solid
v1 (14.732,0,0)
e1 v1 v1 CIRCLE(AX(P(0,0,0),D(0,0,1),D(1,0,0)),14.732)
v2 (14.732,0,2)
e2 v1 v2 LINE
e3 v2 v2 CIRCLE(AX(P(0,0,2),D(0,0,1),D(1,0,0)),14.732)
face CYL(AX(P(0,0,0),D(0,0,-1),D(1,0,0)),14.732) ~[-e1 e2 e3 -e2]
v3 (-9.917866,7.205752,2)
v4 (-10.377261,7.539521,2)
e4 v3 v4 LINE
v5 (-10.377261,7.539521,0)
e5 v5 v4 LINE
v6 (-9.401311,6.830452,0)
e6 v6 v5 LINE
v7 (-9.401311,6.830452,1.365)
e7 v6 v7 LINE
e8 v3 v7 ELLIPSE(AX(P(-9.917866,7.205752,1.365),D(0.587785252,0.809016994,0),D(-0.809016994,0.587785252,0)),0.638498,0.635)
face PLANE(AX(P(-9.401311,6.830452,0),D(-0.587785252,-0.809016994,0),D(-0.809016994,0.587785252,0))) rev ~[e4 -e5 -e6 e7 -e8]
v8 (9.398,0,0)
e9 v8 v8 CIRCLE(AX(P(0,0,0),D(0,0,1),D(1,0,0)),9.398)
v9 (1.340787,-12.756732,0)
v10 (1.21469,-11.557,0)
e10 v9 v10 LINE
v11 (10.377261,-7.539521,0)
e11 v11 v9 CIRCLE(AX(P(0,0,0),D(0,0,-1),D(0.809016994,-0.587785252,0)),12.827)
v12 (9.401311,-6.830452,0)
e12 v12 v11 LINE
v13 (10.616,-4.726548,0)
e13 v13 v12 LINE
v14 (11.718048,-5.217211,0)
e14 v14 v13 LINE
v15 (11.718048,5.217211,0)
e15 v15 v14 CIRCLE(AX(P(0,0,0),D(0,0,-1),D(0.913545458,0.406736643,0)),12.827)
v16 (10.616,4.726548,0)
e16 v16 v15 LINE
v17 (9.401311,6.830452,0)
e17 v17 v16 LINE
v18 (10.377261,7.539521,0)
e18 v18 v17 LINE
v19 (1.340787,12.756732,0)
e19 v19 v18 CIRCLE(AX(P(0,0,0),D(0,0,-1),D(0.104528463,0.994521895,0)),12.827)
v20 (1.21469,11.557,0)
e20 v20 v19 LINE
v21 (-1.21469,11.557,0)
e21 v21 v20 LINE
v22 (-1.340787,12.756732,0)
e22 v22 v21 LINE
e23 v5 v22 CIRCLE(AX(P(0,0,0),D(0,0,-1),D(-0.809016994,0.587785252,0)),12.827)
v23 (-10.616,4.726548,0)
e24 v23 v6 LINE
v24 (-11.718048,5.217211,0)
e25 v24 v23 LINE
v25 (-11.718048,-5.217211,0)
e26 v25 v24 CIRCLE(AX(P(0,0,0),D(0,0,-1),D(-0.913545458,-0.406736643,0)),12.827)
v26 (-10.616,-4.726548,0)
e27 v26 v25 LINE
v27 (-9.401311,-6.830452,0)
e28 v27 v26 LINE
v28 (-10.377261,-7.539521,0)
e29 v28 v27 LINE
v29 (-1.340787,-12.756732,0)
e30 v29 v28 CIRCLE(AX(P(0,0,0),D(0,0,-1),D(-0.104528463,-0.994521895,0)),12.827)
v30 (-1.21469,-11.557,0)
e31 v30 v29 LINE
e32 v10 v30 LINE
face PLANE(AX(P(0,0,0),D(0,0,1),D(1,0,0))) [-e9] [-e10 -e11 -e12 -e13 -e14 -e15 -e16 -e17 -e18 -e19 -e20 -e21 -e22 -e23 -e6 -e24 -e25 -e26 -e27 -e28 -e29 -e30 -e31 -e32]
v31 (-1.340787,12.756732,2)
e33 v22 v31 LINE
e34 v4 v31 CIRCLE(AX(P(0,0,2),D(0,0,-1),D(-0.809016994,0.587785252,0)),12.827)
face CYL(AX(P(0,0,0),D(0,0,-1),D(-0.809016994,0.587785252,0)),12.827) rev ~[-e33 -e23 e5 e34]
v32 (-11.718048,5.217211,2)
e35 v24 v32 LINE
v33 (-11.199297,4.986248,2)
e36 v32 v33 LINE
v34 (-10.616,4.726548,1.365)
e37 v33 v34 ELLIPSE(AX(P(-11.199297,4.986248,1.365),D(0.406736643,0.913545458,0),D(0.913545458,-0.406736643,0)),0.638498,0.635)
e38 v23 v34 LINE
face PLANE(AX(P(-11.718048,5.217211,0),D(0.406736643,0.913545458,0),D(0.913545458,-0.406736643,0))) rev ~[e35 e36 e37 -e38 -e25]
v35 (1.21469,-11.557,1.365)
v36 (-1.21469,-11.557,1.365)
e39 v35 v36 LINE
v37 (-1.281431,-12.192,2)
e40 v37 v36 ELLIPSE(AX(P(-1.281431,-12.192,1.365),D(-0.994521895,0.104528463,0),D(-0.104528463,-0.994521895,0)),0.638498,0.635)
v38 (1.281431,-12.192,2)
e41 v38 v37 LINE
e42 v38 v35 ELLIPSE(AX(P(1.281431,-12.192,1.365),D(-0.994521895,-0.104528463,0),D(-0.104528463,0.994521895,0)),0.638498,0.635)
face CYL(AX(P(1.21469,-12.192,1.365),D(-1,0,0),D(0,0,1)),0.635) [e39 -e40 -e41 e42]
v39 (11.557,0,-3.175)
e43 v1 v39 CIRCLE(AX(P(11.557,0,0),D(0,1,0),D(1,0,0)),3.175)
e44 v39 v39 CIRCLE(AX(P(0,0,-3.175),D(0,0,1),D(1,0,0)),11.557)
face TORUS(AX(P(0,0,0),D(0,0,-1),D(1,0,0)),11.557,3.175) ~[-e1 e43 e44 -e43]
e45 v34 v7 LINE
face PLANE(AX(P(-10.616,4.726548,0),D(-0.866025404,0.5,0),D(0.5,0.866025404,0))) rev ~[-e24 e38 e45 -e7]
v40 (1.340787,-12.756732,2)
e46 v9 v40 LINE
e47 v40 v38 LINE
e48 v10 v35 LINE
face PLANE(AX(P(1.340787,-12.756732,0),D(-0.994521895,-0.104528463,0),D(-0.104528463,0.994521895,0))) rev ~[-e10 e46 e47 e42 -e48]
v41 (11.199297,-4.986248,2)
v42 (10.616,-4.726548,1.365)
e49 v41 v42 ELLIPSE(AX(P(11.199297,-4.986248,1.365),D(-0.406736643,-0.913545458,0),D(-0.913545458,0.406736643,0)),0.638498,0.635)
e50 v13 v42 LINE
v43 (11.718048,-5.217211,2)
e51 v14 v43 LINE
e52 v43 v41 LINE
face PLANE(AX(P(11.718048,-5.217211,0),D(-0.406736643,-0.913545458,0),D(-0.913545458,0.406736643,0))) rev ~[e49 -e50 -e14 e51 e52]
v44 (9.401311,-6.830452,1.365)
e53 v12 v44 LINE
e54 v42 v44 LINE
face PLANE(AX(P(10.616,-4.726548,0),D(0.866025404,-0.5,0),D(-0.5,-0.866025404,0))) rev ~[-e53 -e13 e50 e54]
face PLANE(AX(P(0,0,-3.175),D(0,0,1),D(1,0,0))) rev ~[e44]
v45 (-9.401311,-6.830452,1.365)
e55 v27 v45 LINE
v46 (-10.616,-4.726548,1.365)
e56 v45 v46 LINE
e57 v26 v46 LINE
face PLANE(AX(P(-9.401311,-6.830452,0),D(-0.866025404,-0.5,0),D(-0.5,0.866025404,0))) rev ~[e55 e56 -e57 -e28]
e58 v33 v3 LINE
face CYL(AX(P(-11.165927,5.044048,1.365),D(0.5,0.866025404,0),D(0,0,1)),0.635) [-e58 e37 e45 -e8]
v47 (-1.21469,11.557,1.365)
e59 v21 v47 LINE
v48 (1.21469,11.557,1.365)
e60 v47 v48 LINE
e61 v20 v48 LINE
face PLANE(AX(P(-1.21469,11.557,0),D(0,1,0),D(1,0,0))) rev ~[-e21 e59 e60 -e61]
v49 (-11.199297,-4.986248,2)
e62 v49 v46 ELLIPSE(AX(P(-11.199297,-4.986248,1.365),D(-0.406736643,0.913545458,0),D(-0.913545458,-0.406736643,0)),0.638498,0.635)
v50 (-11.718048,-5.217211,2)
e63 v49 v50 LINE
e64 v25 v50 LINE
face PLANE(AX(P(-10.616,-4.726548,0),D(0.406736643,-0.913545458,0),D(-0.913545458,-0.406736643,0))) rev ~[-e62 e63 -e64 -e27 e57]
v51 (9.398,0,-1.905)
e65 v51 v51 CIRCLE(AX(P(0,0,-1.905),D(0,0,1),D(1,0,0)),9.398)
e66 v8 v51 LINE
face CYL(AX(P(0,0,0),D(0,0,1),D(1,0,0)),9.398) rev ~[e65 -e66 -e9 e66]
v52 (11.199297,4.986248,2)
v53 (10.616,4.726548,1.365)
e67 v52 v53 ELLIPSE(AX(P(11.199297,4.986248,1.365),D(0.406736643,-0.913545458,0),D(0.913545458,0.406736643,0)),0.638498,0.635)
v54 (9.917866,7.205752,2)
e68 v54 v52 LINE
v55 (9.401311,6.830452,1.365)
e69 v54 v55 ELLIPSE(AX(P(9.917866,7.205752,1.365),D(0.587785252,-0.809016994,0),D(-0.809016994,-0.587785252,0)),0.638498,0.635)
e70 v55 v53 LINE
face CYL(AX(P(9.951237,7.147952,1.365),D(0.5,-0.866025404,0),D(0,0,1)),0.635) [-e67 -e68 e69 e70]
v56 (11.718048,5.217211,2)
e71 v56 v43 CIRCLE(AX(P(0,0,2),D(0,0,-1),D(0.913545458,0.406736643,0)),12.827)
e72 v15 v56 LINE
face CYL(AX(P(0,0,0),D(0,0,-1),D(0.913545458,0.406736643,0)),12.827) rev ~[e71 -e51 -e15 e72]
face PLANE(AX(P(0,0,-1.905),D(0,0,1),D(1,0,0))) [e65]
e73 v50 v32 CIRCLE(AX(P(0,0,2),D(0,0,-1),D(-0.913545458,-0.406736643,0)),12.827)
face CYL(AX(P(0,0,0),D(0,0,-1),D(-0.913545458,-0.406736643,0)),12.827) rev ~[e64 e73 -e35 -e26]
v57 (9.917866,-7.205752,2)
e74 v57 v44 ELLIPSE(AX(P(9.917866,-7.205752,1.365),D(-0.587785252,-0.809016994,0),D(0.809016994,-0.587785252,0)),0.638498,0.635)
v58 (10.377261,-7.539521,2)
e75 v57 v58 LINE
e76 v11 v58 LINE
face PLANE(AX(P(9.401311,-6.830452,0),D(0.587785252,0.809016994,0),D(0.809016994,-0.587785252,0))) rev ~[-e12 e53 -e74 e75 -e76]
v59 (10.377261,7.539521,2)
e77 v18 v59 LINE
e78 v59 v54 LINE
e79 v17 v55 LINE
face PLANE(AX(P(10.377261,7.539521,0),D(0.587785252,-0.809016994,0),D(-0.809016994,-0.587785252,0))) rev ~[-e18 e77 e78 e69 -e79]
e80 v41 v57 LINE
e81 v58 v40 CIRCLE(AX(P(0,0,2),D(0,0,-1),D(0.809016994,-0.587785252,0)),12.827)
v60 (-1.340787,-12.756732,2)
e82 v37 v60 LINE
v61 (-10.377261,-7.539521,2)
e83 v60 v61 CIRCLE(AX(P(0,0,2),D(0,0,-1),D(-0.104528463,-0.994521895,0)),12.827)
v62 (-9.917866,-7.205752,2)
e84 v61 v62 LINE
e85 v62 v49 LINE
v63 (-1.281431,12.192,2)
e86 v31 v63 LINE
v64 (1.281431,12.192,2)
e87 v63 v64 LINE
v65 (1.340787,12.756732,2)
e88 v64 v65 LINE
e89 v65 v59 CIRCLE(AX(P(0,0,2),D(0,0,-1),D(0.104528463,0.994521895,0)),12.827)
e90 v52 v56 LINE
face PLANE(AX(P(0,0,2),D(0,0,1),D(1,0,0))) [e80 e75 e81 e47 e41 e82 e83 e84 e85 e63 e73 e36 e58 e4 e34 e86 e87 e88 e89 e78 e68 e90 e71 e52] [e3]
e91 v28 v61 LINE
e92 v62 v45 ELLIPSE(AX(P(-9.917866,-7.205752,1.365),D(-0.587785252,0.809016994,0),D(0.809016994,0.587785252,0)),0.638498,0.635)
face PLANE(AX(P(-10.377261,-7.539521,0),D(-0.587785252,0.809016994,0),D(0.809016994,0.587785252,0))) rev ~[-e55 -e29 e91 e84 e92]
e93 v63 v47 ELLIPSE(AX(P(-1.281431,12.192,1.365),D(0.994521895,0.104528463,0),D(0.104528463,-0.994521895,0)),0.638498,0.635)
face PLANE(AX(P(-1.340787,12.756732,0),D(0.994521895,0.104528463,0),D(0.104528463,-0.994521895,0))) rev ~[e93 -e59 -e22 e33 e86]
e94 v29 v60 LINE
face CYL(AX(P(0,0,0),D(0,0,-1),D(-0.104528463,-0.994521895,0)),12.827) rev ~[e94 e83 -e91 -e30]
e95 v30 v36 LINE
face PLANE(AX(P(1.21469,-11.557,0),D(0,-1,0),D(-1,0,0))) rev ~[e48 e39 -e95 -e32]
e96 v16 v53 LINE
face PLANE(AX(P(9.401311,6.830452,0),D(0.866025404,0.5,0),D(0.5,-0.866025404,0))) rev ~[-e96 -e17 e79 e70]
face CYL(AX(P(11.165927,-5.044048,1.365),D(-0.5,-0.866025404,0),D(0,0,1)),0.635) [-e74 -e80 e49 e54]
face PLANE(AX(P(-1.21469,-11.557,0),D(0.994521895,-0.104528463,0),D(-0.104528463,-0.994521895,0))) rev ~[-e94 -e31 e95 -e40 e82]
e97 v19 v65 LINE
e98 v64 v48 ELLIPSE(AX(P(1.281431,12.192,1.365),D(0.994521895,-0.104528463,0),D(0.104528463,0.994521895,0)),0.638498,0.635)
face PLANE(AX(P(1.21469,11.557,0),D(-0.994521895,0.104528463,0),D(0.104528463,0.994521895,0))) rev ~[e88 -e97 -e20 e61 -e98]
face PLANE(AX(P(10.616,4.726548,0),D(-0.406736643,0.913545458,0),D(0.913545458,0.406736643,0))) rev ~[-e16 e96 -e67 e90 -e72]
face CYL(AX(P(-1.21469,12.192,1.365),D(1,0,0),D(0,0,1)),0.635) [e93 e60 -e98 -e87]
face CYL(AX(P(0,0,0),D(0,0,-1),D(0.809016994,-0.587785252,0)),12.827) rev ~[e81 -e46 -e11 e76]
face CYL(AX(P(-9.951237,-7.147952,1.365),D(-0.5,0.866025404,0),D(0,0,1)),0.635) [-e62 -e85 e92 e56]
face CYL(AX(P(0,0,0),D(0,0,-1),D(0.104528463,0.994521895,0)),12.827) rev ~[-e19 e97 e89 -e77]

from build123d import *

# Parameters (mm, degrees)
F0_R     = 14.732
F1_DEPTH = 3.175
F2_DEPTH = 2
F3_R     = 9.398
F4_DEPTH = 1.905
F6_R     = 0.635


# Not quite as in the source:
# - a fillet or chamfer that OpenCascade refuses, or shapes differently, is made with other operations: its cross-section is extruded or revolved along the edge and cut away or added


with BuildPart() as f1:
    # F0 (on Top) → F1 (new body)
    with BuildSketch(Plane.XY):
        Circle(F0_R)
        with BuildLine():
            ThreePointArc((-10.3772609868, 7.5395214312), (-6.4135, 11.1085078543), (-1.3407865983, 12.7567323519))
            Line((-1.3407865983, 12.7567323519), (-1.214689647, 11.557))
            Line((-1.214689647, 11.557), (1.214689647, 11.557))
            Line((1.214689647, 11.557), (1.3407865983, 12.7567323519))
            ThreePointArc((1.3407865983, 12.7567323519), (6.4135, 11.1085078543), (10.3772609868, 7.5395214312))
            Line((10.3772609868, 7.5395214312), (9.4013107681, 6.830452092))
            Line((9.4013107681, 6.830452092), (10.616000415, 4.726547908))
            Line((10.616000415, 4.726547908), (11.7180475852, 5.2172109207))
            ThreePointArc((11.7180475852, 5.2172109207), (12.827, 0), (11.7180475852, -5.2172109207))
            Line((11.7180475852, -5.2172109207), (10.616000415, -4.726547908))
            Line((10.616000415, -4.726547908), (9.4013107681, -6.830452092))
            Line((9.4013107681, -6.830452092), (10.3772609868, -7.5395214312))
            ThreePointArc((10.3772609868, -7.5395214312), (6.4135, -11.1085078543), (1.3407865983, -12.7567323519))
            Line((1.3407865983, -12.7567323519), (1.214689647, -11.557))
            Line((1.214689647, -11.557), (-1.214689647, -11.557))
            Line((-1.214689647, -11.557), (-1.3407865983, -12.7567323519))
            ThreePointArc((-1.3407865983, -12.7567323519), (-6.4135, -11.1085078543), (-10.3772609868, -7.5395214312))
            Line((-10.3772609868, -7.5395214312), (-9.4013107681, -6.830452092))
            Line((-9.4013107681, -6.830452092), (-10.616000415, -4.726547908))
            Line((-10.616000415, -4.726547908), (-11.7180475852, -5.2172109207))
            ThreePointArc((-11.7180475852, -5.2172109207), (-12.827, 0), (-11.7180475852, 5.2172109207))
            Line((-11.7180475852, 5.2172109207), (-10.616000415, 4.726547908))
            Line((-10.616000415, 4.726547908), (-9.4013107681, 6.830452092))
            Line((-9.4013107681, 6.830452092), (-10.3772609868, 7.5395214312))
        make_face(mode=Mode.SUBTRACT)
        with BuildLine():
            Line((-1.214689647, 11.557), (-1.3407865983, 12.7567323519))
            ThreePointArc((-1.3407865983, 12.7567323519), (-6.4135, 11.1085078543), (-10.3772609868, 7.5395214312))
            Line((-10.3772609868, 7.5395214312), (-9.4013107681, 6.830452092))
            Line((-9.4013107681, 6.830452092), (-10.616000415, 4.726547908))
            Line((-10.616000415, 4.726547908), (-11.7180475852, 5.2172109207))
            ThreePointArc((-11.7180475852, 5.2172109207), (-12.827, 0), (-11.7180475852, -5.2172109207))
            Line((-11.7180475852, -5.2172109207), (-10.616000415, -4.726547908))
            Line((-10.616000415, -4.726547908), (-9.4013107681, -6.830452092))
            Line((-9.4013107681, -6.830452092), (-10.3772609868, -7.5395214312))
            ThreePointArc((-10.3772609868, -7.5395214312), (-6.4135, -11.1085078543), (-1.3407865983, -12.7567323519))
            Line((-1.3407865983, -12.7567323519), (-1.214689647, -11.557))
            Line((-1.214689647, -11.557), (1.214689647, -11.557))
            Line((1.214689647, -11.557), (1.3407865983, -12.7567323519))
            ThreePointArc((1.3407865983, -12.7567323519), (6.4135, -11.1085078543), (10.3772609868, -7.5395214312))
            Line((10.3772609868, -7.5395214312), (9.4013107681, -6.830452092))
            Line((9.4013107681, -6.830452092), (10.616000415, -4.726547908))
            Line((10.616000415, -4.726547908), (11.7180475852, -5.2172109207))
            ThreePointArc((11.7180475852, -5.2172109207), (12.827, 0), (11.7180475852, 5.2172109207))
            Line((11.7180475852, 5.2172109207), (10.616000415, 4.726547908))
            Line((10.616000415, 4.726547908), (9.4013107681, 6.830452092))
            Line((9.4013107681, 6.830452092), (10.3772609868, 7.5395214312))
            ThreePointArc((10.3772609868, 7.5395214312), (6.4135, 11.1085078543), (1.3407865983, 12.7567323519))
            Line((1.3407865983, 12.7567323519), (1.214689647, 11.557))
            Line((1.214689647, 11.557), (-1.214689647, 11.557))
        make_face()
    extrude(amount=-F1_DEPTH)

    # F0 (on Top) → F2 (join)
    with BuildSketch(Plane.XY):
        Circle(F0_R)
        with BuildLine():
            ThreePointArc((-10.3772609868, 7.5395214312), (-6.4135, 11.1085078543), (-1.3407865983, 12.7567323519))
            Line((-1.3407865983, 12.7567323519), (-1.214689647, 11.557))
            Line((-1.214689647, 11.557), (1.214689647, 11.557))
            Line((1.214689647, 11.557), (1.3407865983, 12.7567323519))
            ThreePointArc((1.3407865983, 12.7567323519), (6.4135, 11.1085078543), (10.3772609868, 7.5395214312))
            Line((10.3772609868, 7.5395214312), (9.4013107681, 6.830452092))
            Line((9.4013107681, 6.830452092), (10.616000415, 4.726547908))
            Line((10.616000415, 4.726547908), (11.7180475852, 5.2172109207))
            ThreePointArc((11.7180475852, 5.2172109207), (12.827, 0), (11.7180475852, -5.2172109207))
            Line((11.7180475852, -5.2172109207), (10.616000415, -4.726547908))
            Line((10.616000415, -4.726547908), (9.4013107681, -6.830452092))
            Line((9.4013107681, -6.830452092), (10.3772609868, -7.5395214312))
            ThreePointArc((10.3772609868, -7.5395214312), (6.4135, -11.1085078543), (1.3407865983, -12.7567323519))
            Line((1.3407865983, -12.7567323519), (1.214689647, -11.557))
            Line((1.214689647, -11.557), (-1.214689647, -11.557))
            Line((-1.214689647, -11.557), (-1.3407865983, -12.7567323519))
            ThreePointArc((-1.3407865983, -12.7567323519), (-6.4135, -11.1085078543), (-10.3772609868, -7.5395214312))
            Line((-10.3772609868, -7.5395214312), (-9.4013107681, -6.830452092))
            Line((-9.4013107681, -6.830452092), (-10.616000415, -4.726547908))
            Line((-10.616000415, -4.726547908), (-11.7180475852, -5.2172109207))
            ThreePointArc((-11.7180475852, -5.2172109207), (-12.827, 0), (-11.7180475852, 5.2172109207))
            Line((-11.7180475852, 5.2172109207), (-10.616000415, 4.726547908))
            Line((-10.616000415, 4.726547908), (-9.4013107681, 6.830452092))
            Line((-9.4013107681, 6.830452092), (-10.3772609868, 7.5395214312))
        make_face(mode=Mode.SUBTRACT)
    extrude(amount=F2_DEPTH)

    # F3 (on face) → F4 (cut)
    with BuildSketch(Plane.XY):
        Circle(F3_R)
    extrude(amount=-F4_DEPTH, mode=Mode.SUBTRACT)

    # F5: fillet of radius 3.175 on 1 edges, made by hand

    # F5_s1 → F5_t2 (revolve, cut)
    with BuildSketch(Plane.XZ):
        with BuildLine():
            ThreePointArc((14.732, 0), (13.8020640303, -2.2450640303), (11.557, -3.175))
            Line((11.557, -3.175), (14.732, -3.175))
            Line((14.732, -3.175), (14.732, 0))
        make_face()
    revolve(axis=Axis((0, 0, -3.175), (0, 0, 1)), mode=Mode.SUBTRACT)

    # F6
    f6_edges = [f1.edges().sort_by_distance(p)[0] for p in [
        (0, 11.557, 2),
        (10.008656, -5.7785, 2),
        (-10.008656, 5.7785, 2),
        (-10.008656, -5.7785, 2),
        (0, -11.557, 2),
        (10.008656, 5.7785, 2),
    ]]
    fillet(f6_edges, radius=F6_R)


solid = f1.part
